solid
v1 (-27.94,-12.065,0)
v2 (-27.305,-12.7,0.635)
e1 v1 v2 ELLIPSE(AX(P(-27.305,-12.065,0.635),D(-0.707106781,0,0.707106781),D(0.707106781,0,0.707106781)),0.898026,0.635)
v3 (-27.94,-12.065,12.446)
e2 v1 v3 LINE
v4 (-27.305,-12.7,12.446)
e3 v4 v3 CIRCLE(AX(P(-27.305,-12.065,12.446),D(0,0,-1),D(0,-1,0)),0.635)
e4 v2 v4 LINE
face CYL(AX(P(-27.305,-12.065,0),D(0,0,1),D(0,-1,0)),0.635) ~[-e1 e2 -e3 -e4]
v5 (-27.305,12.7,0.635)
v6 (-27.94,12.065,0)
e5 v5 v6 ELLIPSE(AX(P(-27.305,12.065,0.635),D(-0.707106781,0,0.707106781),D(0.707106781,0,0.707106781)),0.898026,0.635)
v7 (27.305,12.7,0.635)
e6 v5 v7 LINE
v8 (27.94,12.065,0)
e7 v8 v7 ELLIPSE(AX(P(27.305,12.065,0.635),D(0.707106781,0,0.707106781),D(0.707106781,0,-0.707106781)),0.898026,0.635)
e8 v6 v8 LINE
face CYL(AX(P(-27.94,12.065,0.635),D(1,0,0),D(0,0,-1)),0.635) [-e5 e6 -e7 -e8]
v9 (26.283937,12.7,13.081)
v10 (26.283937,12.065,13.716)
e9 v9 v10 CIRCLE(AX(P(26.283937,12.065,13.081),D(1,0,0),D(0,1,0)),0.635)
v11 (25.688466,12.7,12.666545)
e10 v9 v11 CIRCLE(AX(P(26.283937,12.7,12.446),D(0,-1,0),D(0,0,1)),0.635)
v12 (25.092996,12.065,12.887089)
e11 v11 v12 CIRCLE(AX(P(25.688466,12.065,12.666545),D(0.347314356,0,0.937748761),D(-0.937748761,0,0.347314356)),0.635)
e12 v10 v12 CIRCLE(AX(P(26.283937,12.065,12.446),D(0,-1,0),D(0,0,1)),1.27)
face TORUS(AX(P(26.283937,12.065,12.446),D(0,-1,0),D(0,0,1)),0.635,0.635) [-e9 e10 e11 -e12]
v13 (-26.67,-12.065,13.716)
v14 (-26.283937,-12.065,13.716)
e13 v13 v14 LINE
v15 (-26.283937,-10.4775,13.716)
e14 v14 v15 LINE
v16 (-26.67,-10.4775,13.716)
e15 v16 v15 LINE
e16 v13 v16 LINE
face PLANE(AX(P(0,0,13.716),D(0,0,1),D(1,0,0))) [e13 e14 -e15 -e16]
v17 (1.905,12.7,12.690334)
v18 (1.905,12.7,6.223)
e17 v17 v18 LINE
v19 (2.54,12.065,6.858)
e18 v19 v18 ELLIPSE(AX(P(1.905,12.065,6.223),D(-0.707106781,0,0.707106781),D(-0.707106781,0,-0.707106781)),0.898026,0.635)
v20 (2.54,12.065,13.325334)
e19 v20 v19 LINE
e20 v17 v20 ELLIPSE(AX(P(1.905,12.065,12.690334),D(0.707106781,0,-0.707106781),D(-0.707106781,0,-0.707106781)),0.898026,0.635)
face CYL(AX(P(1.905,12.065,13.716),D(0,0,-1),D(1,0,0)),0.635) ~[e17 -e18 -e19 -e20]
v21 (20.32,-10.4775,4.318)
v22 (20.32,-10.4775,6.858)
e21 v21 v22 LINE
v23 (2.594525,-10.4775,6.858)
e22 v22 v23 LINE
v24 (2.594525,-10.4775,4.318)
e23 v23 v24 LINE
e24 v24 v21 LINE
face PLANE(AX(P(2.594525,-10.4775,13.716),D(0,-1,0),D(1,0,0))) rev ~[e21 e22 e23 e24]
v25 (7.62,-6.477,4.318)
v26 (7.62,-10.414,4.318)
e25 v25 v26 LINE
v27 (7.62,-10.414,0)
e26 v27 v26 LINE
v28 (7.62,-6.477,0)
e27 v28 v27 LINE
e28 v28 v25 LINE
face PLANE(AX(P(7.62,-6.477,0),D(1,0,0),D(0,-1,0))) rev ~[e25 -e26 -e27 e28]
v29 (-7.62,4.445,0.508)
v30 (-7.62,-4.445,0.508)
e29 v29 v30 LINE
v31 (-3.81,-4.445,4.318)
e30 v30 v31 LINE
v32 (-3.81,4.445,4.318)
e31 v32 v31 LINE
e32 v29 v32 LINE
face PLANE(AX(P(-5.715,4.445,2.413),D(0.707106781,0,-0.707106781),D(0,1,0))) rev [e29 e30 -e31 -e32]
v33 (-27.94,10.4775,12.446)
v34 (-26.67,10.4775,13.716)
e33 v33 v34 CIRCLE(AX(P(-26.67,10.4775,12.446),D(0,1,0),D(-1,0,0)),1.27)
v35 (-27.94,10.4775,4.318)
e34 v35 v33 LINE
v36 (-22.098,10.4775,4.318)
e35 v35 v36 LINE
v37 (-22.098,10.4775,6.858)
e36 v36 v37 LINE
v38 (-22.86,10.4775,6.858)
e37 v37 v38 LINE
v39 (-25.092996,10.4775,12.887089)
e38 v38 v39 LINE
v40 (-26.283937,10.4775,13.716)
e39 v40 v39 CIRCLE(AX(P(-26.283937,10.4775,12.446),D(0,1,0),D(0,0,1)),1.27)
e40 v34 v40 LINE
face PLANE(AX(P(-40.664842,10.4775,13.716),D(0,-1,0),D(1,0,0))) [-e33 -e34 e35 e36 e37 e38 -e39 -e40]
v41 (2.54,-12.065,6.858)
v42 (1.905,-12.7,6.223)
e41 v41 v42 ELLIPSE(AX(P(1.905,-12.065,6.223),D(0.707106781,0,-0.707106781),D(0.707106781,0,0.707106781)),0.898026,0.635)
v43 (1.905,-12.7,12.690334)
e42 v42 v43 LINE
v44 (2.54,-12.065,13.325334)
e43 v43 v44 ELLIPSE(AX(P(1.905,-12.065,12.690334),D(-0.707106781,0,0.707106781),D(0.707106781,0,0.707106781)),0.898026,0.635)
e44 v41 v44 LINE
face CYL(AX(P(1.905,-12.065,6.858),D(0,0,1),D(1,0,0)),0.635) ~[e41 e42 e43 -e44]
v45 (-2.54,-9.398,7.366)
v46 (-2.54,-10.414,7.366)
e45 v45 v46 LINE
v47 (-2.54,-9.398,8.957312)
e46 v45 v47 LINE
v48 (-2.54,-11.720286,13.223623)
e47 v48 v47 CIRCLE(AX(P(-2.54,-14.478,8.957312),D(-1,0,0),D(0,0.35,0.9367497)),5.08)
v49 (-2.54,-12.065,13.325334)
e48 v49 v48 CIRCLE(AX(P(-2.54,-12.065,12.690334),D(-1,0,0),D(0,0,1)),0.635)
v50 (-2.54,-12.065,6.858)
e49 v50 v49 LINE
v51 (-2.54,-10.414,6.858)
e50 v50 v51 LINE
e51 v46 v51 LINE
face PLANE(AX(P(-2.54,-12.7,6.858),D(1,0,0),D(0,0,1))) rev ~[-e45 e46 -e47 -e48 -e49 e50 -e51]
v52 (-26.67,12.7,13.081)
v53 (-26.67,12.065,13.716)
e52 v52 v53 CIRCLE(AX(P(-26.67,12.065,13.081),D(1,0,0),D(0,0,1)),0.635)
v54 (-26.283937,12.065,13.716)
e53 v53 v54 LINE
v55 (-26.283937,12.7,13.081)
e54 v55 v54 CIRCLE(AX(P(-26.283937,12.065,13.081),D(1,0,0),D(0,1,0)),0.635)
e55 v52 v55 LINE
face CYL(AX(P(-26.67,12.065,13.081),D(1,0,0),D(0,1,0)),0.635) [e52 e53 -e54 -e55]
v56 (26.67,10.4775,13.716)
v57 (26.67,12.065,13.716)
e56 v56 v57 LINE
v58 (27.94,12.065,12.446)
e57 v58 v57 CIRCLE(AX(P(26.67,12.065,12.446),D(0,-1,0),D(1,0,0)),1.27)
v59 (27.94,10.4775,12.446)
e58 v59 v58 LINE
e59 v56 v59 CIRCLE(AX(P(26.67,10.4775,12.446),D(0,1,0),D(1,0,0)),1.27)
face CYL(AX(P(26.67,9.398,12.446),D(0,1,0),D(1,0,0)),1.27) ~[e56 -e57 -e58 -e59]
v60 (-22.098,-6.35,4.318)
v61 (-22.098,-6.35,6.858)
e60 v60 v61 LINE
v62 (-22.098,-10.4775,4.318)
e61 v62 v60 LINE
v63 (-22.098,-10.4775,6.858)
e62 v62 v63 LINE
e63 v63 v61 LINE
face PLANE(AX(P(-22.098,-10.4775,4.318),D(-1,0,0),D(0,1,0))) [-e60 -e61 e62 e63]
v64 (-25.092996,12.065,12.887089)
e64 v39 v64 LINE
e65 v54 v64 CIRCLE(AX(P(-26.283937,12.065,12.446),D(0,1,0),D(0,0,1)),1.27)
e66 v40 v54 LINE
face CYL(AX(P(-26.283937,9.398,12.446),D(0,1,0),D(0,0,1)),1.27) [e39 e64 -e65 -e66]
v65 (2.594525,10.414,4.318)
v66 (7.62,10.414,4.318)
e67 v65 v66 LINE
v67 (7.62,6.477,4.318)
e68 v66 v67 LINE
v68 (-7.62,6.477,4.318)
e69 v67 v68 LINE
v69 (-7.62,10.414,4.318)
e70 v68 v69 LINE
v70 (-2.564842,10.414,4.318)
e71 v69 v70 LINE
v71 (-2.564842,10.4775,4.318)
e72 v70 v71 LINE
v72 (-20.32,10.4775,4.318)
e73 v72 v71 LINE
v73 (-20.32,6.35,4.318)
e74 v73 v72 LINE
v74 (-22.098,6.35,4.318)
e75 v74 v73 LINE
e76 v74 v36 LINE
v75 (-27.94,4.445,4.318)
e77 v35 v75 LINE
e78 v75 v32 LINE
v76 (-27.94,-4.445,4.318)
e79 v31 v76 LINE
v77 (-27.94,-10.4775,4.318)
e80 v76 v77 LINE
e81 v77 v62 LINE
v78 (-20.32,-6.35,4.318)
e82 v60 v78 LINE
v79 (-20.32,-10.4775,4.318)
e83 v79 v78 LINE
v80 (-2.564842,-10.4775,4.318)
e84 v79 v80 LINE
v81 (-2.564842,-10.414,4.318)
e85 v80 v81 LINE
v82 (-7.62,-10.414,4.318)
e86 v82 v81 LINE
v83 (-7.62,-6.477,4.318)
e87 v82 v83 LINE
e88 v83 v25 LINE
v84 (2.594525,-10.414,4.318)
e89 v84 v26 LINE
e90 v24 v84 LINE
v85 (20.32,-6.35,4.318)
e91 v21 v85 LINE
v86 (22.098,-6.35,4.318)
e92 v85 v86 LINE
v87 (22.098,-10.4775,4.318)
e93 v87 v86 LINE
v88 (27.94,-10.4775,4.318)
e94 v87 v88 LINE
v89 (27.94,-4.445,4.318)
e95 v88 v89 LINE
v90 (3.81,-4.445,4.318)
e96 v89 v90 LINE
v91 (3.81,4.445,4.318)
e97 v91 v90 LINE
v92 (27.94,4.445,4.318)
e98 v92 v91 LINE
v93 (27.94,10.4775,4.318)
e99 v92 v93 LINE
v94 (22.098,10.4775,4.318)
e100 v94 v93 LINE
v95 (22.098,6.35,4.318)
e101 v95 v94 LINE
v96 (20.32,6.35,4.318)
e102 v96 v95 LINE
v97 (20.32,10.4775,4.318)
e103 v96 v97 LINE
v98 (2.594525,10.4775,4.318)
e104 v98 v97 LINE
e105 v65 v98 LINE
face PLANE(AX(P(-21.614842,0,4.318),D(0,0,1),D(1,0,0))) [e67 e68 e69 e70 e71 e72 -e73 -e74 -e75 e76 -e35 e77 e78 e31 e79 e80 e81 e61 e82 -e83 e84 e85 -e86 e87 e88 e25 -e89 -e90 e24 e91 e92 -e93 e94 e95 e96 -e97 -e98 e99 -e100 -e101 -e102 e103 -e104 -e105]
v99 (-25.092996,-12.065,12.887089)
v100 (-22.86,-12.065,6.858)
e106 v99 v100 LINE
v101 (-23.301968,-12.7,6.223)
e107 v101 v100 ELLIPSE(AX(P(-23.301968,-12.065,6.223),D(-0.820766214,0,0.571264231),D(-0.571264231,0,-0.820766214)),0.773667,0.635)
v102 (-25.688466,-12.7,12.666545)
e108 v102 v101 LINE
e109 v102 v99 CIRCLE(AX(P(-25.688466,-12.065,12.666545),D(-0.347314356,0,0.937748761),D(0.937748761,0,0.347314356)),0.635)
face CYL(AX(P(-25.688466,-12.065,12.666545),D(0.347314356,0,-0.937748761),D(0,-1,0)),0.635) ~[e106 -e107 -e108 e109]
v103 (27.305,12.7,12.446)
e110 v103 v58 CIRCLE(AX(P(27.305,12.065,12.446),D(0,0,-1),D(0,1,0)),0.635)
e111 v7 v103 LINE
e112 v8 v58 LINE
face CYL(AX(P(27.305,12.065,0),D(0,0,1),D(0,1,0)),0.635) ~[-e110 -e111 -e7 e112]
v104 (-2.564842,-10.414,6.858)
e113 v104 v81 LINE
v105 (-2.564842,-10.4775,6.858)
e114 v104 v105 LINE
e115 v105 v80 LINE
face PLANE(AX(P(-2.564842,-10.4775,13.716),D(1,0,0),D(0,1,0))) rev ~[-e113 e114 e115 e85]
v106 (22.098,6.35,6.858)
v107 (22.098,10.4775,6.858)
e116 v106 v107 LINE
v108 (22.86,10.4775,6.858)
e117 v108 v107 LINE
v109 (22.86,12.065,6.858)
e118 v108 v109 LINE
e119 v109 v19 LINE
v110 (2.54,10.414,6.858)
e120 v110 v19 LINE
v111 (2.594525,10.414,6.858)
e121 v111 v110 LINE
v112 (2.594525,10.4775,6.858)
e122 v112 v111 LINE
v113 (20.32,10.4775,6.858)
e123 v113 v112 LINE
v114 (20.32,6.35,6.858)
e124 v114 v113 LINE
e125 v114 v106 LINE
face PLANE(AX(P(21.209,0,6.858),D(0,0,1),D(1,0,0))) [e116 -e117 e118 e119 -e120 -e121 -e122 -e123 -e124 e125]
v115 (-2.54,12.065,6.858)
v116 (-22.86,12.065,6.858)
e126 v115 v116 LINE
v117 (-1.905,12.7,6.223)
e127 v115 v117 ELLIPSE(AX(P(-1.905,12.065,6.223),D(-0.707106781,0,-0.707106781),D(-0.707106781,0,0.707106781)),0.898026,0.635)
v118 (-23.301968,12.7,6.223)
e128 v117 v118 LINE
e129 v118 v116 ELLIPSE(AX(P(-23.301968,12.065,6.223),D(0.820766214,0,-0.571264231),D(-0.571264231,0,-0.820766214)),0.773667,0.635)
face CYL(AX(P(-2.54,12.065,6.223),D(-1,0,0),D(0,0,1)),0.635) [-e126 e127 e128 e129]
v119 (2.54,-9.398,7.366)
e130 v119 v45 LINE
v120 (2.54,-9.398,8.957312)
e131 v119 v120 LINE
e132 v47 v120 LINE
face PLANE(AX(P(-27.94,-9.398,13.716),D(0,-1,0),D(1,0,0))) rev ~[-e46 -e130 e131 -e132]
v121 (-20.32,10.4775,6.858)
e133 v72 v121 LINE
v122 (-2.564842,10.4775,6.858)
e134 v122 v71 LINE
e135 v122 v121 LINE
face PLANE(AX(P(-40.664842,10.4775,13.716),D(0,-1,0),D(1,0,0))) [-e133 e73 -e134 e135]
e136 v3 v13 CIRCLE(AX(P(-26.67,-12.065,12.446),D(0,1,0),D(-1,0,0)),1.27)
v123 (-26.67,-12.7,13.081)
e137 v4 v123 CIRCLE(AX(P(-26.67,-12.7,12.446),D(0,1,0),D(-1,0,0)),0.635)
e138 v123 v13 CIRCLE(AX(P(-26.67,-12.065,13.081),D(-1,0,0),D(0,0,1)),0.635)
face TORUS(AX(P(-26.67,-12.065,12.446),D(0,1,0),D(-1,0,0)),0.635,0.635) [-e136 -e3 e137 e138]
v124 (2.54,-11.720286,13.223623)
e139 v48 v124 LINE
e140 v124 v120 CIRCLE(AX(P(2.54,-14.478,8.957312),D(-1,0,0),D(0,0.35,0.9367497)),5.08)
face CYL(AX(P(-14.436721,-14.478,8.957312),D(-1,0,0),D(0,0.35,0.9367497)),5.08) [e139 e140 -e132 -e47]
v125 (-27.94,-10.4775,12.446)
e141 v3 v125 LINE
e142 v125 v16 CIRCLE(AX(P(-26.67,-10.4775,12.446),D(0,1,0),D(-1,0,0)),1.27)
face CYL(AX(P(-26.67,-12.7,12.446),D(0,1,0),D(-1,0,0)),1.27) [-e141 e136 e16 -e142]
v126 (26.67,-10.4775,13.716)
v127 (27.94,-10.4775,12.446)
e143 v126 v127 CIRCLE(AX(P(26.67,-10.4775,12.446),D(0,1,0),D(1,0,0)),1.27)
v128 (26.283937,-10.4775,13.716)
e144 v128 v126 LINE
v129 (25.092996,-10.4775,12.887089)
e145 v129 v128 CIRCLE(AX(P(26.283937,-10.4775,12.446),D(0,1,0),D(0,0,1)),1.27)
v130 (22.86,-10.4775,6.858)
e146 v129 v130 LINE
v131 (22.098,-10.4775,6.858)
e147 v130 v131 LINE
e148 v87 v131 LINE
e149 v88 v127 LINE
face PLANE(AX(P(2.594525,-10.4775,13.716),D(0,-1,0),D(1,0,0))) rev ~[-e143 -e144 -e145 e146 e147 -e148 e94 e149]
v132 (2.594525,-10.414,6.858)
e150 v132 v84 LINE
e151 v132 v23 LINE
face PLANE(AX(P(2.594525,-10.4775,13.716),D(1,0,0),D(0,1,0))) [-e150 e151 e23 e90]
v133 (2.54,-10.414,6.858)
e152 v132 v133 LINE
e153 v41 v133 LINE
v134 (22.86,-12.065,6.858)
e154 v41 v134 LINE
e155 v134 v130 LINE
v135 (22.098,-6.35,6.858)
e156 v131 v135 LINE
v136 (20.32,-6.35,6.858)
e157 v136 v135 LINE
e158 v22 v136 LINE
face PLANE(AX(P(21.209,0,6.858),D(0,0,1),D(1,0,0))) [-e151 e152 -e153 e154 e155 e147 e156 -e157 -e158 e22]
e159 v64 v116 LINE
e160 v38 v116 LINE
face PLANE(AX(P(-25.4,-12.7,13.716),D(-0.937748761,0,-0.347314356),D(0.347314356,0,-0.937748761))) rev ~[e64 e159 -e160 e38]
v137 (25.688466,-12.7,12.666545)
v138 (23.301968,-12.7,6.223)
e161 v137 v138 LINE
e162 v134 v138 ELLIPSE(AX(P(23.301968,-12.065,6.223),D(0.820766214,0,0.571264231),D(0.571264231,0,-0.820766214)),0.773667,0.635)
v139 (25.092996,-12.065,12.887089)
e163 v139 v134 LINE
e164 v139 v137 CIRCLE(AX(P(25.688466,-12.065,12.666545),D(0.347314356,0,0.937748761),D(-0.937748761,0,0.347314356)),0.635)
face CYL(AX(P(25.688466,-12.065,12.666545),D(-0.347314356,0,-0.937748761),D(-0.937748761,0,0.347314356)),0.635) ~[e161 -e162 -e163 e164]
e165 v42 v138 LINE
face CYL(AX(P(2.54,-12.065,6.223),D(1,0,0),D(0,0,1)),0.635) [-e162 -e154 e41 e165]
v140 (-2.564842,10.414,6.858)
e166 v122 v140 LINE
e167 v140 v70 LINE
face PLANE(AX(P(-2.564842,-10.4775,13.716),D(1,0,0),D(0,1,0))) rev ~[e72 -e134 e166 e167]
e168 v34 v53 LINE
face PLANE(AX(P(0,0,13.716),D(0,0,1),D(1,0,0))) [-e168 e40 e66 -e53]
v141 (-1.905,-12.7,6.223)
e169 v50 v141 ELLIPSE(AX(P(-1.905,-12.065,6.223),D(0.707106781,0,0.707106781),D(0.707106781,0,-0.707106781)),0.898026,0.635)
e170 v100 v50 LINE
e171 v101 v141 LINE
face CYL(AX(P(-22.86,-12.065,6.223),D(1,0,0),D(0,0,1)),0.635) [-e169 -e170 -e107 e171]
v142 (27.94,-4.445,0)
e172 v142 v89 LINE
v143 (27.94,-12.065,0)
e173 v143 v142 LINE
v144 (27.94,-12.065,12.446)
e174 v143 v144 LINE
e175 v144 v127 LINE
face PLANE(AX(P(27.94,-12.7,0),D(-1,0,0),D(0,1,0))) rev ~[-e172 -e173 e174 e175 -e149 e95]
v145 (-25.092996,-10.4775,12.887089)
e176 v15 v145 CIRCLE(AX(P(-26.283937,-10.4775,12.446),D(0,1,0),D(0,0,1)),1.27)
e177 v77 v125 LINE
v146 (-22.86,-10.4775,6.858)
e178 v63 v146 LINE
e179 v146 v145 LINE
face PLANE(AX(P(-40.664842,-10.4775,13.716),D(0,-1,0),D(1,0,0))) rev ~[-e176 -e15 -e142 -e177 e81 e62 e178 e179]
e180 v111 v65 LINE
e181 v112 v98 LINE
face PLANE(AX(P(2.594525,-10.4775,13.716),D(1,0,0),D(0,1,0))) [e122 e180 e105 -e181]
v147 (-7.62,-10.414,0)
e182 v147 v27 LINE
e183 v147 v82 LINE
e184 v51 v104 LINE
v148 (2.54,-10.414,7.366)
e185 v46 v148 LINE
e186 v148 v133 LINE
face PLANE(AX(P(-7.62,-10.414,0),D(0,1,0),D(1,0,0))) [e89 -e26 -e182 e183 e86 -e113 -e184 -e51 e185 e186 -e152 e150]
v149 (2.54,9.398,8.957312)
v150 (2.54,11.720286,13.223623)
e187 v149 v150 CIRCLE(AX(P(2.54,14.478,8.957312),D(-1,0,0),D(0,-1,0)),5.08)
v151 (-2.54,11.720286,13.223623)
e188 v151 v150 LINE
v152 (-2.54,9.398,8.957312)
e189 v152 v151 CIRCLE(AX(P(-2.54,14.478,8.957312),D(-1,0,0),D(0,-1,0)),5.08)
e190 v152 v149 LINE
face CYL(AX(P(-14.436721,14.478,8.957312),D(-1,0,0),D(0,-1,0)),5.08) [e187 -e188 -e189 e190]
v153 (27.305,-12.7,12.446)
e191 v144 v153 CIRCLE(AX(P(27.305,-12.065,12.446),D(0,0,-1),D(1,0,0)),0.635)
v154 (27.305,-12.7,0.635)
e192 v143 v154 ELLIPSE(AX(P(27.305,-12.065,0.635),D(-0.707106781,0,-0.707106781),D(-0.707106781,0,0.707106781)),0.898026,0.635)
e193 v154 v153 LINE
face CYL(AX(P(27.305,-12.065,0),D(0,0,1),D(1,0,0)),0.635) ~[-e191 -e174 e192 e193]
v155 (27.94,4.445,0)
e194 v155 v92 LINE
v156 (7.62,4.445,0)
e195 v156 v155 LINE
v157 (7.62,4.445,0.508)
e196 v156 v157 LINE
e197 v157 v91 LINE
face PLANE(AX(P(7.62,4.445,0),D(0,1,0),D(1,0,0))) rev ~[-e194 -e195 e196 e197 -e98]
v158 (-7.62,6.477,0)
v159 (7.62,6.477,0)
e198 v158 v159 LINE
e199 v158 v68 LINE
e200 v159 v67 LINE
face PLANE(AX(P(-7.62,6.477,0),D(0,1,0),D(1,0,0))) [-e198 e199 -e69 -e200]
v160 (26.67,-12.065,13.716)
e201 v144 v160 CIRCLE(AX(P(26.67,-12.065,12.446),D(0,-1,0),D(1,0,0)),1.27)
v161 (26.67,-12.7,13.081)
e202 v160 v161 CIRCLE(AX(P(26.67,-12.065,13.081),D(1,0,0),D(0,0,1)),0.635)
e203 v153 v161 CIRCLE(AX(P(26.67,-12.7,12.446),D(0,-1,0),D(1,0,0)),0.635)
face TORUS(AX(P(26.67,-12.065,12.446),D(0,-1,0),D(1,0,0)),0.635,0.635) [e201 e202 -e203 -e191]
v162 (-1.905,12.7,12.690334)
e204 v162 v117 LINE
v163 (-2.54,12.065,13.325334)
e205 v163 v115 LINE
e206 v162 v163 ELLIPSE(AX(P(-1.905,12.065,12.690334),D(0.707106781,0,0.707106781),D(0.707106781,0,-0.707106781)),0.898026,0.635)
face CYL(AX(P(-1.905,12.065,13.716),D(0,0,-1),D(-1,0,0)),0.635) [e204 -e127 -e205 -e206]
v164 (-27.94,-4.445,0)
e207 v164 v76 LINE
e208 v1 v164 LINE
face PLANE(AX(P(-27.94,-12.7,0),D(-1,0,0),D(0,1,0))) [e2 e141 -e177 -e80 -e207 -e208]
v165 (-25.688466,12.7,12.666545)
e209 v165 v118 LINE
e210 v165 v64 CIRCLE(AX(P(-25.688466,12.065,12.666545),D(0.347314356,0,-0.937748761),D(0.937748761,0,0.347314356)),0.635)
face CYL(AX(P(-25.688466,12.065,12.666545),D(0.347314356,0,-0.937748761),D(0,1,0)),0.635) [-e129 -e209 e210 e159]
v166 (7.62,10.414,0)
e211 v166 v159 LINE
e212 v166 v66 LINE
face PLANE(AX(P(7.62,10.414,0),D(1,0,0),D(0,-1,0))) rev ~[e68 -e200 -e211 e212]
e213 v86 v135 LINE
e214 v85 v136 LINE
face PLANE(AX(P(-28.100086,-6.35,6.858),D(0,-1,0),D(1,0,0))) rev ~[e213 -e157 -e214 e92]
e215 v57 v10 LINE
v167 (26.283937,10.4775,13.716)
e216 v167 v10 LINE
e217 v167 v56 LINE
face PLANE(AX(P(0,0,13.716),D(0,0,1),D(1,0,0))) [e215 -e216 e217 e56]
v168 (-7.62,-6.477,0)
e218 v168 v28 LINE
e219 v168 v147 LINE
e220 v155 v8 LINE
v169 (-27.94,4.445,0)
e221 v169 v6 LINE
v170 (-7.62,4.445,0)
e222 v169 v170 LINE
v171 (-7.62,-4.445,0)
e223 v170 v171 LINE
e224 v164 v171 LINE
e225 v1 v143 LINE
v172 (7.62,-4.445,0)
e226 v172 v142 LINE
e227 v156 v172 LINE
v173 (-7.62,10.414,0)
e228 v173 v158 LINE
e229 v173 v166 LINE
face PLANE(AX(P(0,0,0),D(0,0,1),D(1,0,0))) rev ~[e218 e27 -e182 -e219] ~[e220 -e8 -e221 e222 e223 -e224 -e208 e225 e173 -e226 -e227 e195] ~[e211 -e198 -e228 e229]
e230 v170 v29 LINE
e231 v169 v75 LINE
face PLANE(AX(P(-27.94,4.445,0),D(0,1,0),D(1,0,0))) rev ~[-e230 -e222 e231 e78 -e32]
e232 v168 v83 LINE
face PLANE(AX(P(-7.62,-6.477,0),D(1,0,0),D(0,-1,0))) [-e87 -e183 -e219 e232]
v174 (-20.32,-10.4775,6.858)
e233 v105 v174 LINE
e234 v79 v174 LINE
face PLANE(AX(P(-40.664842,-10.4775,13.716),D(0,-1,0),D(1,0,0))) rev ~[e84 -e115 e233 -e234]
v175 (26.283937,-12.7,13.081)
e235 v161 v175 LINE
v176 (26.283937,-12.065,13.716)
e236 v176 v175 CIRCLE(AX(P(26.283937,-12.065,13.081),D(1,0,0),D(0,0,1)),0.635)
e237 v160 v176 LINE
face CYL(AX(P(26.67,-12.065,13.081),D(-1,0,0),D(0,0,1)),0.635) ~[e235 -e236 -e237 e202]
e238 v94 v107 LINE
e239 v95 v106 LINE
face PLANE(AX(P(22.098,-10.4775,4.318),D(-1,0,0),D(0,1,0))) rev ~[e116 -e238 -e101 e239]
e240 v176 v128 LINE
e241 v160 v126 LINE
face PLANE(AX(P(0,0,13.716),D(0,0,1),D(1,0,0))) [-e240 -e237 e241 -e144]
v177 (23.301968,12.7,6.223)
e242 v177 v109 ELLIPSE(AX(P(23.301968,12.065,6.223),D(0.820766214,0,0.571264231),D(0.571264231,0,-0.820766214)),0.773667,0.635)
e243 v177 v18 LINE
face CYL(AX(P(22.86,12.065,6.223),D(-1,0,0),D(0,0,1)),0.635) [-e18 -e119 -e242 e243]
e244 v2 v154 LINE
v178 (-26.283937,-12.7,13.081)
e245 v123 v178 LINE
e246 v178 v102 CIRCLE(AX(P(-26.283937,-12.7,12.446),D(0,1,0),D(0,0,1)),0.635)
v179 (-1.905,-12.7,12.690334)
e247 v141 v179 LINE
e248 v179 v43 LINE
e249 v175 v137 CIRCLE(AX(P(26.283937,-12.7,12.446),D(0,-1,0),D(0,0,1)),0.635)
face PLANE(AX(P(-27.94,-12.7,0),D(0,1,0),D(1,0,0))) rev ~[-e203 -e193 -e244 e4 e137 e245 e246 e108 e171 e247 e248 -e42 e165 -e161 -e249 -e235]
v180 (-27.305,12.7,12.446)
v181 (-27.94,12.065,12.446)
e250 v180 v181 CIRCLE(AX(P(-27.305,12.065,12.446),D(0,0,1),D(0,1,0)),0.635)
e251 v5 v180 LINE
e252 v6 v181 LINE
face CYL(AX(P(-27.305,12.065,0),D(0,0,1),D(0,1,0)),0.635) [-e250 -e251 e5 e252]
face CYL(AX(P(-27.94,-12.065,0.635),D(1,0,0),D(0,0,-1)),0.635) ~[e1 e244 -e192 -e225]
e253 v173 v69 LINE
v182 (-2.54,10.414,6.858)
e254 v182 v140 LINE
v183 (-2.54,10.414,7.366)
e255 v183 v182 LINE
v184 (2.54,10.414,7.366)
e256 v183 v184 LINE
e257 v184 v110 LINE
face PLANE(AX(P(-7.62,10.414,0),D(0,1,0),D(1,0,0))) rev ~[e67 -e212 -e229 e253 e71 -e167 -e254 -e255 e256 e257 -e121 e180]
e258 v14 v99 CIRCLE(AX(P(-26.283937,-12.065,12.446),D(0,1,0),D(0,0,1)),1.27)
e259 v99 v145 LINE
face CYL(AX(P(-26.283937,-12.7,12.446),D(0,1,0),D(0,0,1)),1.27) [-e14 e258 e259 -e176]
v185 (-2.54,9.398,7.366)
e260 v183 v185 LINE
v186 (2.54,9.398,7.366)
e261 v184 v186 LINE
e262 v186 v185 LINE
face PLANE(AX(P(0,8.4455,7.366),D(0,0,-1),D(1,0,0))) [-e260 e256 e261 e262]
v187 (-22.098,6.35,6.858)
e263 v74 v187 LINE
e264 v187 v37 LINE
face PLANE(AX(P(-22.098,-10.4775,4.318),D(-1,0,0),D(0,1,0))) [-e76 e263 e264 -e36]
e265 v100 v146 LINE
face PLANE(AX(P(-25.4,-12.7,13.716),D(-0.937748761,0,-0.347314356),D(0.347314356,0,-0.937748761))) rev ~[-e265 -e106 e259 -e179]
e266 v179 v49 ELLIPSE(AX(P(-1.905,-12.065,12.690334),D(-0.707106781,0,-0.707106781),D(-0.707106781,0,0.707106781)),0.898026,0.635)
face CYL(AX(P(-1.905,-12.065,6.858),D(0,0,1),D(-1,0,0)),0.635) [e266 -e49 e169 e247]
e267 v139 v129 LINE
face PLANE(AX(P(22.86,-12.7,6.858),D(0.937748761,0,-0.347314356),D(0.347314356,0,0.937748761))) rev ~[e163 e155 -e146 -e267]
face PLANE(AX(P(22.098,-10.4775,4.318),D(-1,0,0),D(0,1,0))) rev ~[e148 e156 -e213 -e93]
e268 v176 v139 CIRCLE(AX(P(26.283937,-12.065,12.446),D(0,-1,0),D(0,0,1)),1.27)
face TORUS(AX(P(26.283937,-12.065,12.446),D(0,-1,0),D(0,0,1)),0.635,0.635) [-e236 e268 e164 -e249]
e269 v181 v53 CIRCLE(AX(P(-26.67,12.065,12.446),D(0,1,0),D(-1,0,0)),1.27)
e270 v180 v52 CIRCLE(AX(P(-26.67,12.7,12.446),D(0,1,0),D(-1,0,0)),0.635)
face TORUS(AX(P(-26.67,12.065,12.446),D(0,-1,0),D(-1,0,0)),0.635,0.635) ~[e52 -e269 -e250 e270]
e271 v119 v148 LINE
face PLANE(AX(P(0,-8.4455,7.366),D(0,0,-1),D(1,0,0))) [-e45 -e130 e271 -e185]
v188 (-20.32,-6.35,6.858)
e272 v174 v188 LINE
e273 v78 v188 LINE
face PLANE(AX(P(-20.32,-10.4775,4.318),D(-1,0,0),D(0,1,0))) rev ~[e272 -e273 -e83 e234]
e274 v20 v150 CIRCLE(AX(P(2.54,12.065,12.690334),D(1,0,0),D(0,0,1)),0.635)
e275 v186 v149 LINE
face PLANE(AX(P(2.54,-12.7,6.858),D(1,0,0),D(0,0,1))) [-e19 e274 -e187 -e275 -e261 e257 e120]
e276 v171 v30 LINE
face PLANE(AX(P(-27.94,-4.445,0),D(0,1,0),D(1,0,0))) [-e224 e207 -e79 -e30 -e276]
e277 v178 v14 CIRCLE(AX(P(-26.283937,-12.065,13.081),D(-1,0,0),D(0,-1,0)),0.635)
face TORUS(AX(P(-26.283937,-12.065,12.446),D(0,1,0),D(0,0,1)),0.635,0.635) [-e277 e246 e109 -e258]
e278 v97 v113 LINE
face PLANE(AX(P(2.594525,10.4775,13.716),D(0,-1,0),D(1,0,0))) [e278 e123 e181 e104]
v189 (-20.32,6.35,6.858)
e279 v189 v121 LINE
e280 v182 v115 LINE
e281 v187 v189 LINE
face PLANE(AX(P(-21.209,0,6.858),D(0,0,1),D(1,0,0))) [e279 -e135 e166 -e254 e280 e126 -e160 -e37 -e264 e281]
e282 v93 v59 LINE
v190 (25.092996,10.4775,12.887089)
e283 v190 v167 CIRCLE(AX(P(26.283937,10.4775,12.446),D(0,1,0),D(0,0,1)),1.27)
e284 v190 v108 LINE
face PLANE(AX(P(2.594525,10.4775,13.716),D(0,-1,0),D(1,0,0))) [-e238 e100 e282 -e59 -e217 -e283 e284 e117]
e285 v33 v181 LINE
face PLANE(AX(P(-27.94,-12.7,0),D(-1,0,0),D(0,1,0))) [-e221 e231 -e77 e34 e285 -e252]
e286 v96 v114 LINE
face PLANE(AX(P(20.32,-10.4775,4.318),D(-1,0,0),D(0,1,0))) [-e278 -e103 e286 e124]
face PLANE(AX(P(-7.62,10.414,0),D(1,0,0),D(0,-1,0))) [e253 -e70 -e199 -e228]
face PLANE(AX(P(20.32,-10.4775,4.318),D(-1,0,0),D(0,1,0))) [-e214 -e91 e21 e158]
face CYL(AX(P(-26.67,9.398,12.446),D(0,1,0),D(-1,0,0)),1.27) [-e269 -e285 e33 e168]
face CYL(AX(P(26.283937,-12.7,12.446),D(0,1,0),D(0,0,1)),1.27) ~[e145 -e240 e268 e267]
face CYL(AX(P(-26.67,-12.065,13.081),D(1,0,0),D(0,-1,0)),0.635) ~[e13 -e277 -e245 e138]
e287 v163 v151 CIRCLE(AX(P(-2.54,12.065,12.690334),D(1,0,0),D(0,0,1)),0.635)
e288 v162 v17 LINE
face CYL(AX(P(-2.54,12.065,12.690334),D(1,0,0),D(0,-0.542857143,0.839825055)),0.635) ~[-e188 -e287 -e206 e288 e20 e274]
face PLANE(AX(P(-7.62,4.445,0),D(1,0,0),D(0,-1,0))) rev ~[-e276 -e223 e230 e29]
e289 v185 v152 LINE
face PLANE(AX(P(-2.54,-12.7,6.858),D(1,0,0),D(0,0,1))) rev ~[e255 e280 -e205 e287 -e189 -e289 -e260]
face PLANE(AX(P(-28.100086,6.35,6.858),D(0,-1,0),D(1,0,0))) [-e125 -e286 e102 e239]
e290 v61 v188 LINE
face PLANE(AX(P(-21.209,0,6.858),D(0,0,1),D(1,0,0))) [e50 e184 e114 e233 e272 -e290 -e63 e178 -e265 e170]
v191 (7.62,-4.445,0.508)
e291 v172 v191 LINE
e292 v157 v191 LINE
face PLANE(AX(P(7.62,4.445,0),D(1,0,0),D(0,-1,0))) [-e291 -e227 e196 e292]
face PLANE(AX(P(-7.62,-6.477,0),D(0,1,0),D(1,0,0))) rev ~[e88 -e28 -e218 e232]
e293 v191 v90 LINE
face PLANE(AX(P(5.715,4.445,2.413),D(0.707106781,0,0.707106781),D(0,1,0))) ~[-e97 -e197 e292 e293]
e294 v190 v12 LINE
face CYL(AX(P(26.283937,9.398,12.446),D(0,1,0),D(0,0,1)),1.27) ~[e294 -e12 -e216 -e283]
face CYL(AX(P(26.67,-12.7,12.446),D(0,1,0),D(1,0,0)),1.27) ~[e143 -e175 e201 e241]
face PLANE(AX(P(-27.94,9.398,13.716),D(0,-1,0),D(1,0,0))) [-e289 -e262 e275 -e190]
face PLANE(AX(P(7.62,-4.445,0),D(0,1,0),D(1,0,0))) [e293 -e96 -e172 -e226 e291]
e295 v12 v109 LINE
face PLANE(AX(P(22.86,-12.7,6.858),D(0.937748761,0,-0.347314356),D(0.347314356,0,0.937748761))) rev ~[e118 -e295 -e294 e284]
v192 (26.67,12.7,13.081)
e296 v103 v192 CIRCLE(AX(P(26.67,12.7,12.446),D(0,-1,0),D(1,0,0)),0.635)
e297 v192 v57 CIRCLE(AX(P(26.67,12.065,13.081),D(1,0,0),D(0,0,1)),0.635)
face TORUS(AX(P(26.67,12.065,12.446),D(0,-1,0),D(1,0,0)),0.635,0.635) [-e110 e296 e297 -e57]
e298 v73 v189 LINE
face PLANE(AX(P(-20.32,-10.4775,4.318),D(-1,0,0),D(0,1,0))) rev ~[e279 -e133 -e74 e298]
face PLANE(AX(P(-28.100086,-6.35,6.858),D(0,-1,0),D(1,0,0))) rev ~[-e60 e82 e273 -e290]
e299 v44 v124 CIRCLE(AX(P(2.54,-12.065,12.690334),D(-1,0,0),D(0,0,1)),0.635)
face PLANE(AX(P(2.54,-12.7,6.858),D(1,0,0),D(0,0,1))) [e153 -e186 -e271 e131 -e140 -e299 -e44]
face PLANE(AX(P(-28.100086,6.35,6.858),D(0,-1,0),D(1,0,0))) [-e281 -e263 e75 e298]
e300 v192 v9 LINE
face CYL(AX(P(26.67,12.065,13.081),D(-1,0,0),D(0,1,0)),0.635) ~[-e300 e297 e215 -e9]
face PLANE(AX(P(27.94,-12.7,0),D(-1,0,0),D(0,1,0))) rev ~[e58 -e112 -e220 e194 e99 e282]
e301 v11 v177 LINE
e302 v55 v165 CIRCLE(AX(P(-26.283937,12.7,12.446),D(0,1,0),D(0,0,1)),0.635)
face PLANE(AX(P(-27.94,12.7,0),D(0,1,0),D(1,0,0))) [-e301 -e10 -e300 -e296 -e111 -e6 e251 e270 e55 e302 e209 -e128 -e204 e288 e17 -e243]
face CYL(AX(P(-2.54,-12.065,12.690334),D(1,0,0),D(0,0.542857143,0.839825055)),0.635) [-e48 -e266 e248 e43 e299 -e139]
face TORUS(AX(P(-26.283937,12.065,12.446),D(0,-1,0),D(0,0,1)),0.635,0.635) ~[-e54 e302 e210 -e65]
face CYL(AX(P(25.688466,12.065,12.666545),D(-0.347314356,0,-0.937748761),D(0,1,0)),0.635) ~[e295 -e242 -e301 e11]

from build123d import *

# Parameters (mm, degrees)
F0_W         = 55.88
F0_H         = 25.4
F1_DEPTH     = 13.716
F2_W         = 20.32
F2_H         = 8.89
F3_DEPTH     = 13.717
F4_W         = 20.32
F4_H         = 8.89
F5_DEPTH     = 13.717
F6_W         = 15.24
F6_H         = 3.937
F7_DEPTH     = 7.366
F8_W         = 15.24
F8_H         = 3.937
F9_DEPTH     = 7.366
F10_W        = 55.88
F10_H        = 18.796
F11_DEPTH    = 9.398
F12_W        = 20.32
F12_H        = 6.858
F13_DEPTH    = 25.401
F14_W        = 20.32
F14_H        = 6.858
F15_DEPTH    = 25.401
F17_DEPTH    = 25.401
F19_DEPTH    = 25.401
F20_R        = 1.27
F21_W        = 38.1
F21_H        = 20.955
F22_DEPTH    = 9.398
F23_W        = 38.1
F23_H        = 20.955
F24_DEPTH    = 9.398
F25_T1_DEPTH = 28.8734423739
F26_W        = 1.778
F26_H        = 20.955
F27_DEPTH    = 2.54
F28_W        = 1.778
F28_H        = 20.955
F29_DEPTH    = 2.54
F30_W        = 55.88
F30_H        = 12.7
F31_DEPTH    = 2.54
F32_SIZE     = 3.81
F33_R        = 0.635


# Not quite as in the source:
# - a fillet or chamfer that OpenCascade refuses, or shapes differently, is made with other operations: its cross-section is extruded or revolved along the edge and cut away or added


with BuildPart() as f1:
    # F0 (on Top) → F1 (new body)
    with BuildSketch(Plane.XY):
        Rectangle(F0_W, F0_H)
    extrude(amount=F1_DEPTH)

    # F2 (on face) → F3 (cut, through all)
    with BuildSketch(Plane(origin=(0, 0, 0), x_dir=(1, 0, 0), z_dir=(0, 0, -1))):
        with Locations((17.78, 0)):
            Rectangle(F2_W, F2_H)
    extrude(amount=-F3_DEPTH, mode=Mode.SUBTRACT)

    # F4 (on face) → F5 (cut, through all)
    with BuildSketch(Plane(origin=(0, 0, 0), x_dir=(1, 0, 0), z_dir=(0, 0, -1))):
        with Locations((-17.78, 0)):
            Rectangle(F4_W, F4_H)
    extrude(amount=-F5_DEPTH, mode=Mode.SUBTRACT)

    # F6 (on face) → F7 (cut)
    with BuildSketch(Plane(origin=(0, 0, 0), x_dir=(1, 0, 0), z_dir=(0, 0, -1))):
        with Locations((0, 8.4455)):
            Rectangle(F6_W, F6_H)
    extrude(amount=-F7_DEPTH, mode=Mode.SUBTRACT)

    # F8 (on face) → F9 (cut)
    with BuildSketch(Plane(origin=(0, 0, 0), x_dir=(1, 0, 0), z_dir=(0, 0, -1))):
        with Locations((0, -8.4455)):
            Rectangle(F8_W, F8_H)
    extrude(amount=-F9_DEPTH, mode=Mode.SUBTRACT)

    # F10 (on face) → F11 (cut)
    with BuildSketch(Plane.XY.offset(13.716)):
        Rectangle(F10_W, F10_H)
    extrude(amount=-F11_DEPTH, mode=Mode.SUBTRACT)

    # F12 (on face) → F13 (cut, through all)
    with BuildSketch(Plane.XZ.offset(12.7)):
        with Locations((-12.7, 10.287)):
            Rectangle(F12_W, F12_H)
    extrude(amount=-F13_DEPTH, mode=Mode.SUBTRACT)

    # F14 (on face) → F15 (cut, through all)
    with BuildSketch(Plane.XZ.offset(12.7)):
        with Locations((12.7, 10.287)):
            Rectangle(F14_W, F14_H)
    extrude(amount=-F15_DEPTH, mode=Mode.SUBTRACT)

    # F16 (on face) → F17 (cut, through all)
    with BuildSketch(Plane.XZ.offset(12.7)):
        Polygon((-25.4, 13.716), (-22.86, 6.858), (-22.86, 13.716), align=None)
    extrude(amount=-F17_DEPTH, mode=Mode.SUBTRACT)

    # F18 (on face) → F19 (cut, through all)
    with BuildSketch(Plane.XZ.offset(12.7)):
        Polygon((22.86, 13.716), (22.86, 6.858), (25.4, 13.716), align=None)
    extrude(amount=-F19_DEPTH, mode=Mode.SUBTRACT)

    # F20
    f20_edges = [f1.edges().sort_by_distance(p)[0] for p in [
        (-25.4, 11.049, 13.716),
        (-25.4, -11.049, 13.716),
        (25.4, 11.049, 13.716),
        (25.4, -11.049, 13.716),
        (-27.94, 11.049, 13.716),
        (-27.94, -11.049, 13.716),
        (27.94, -11.049, 13.716),
        (27.94, 11.049, 13.716),
    ]]
    fillet(f20_edges, radius=F20_R)

    # F21 (on face) → F22 (cut)
    with BuildSketch(Plane.XY.offset(13.716)):
        with Locations((-21.6148423028, 0)):
            Rectangle(F21_W, F21_H)
    extrude(amount=-F22_DEPTH, mode=Mode.SUBTRACT)

    # F23 (on face) → F24 (cut)
    with BuildSketch(Plane.XY.offset(13.716)):
        with Locations((21.6445253996, 0)):
            Rectangle(F23_W, F23_H)
    extrude(amount=-F24_DEPTH, mode=Mode.SUBTRACT)

    # F25: fillet of radius 5.08 on 2 edges, made by hand

    # F25_s2 → F25_t1 (cut)
    with BuildSketch(Plane.YZ.offset(-14.4367211869)):
        with BuildLine():
            ThreePointArc((9.398, 8.9573115252), (10.3043541118, 11.853357105), (12.7, 13.716))
            Line((12.7, 13.716), (9.398, 13.716))
            Line((9.398, 13.716), (9.398, 8.9573115252))
        make_face()
        with BuildLine():
            ThreePointArc((-12.7, 13.716), (-10.3043541118, 11.853357105), (-9.398, 8.9573115252))
            Line((-9.398, 8.9573115252), (-9.398, 13.716))
            Line((-9.398, 13.716), (-12.7, 13.716))
        make_face()
    extrude(amount=F25_T1_DEPTH, mode=Mode.SUBTRACT)

    # F26 (on face) → F27 (join)
    with BuildSketch(Plane.XY.offset(4.318)):
        with Locations((21.209, 0)):
            Rectangle(F26_W, F26_H)
    extrude(amount=F27_DEPTH)

    # F28 (on face) → F29 (join)
    with BuildSketch(Plane.XY.offset(4.318)):
        with Locations((-21.209, 0)):
            Rectangle(F28_W, F28_H)
    extrude(amount=F29_DEPTH)

    # F30 (on face) → F31 (cut)
    with BuildSketch(Plane.XY.offset(6.858)):
        with Locations((-0.1600864343, 0)):
            Rectangle(F30_W, F30_H)
    extrude(amount=-F31_DEPTH, mode=Mode.SUBTRACT)

    # F32
    f32_edges = [f1.edges().sort_by_distance(p)[0] for p in [
        (7.62, 0, 4.318),
        (-7.62, 0, 4.318),
    ]]
    chamfer(f32_edges, length=F32_SIZE)

    # F33
    f33_edges = [f1.edges().sort_by_distance(p)[0] for p in [
        (27.94, -12.7, 6.223),
        (27.568026, -12.7, 13.344026),
        (0, -12.7, 0),
        (26.476968, -12.7, 13.716),
        (-27.94, -12.7, 6.223),
        (25.558431, -12.7, 13.488373),
        (-27.568026, -12.7, 13.344026),
        (23.976498, -12.7, 9.872545),
        (-26.476968, -12.7, 13.716),
        (12.7, -12.7, 6.858),
        (-25.558431, -12.7, 13.488373),
        (2.54, -12.7, 10.287),
        (-23.976498, -12.7, 9.872545),
        (0, -12.7, 13.716),
        (-12.7, -12.7, 6.858),
        (-2.54, -12.7, 10.287),
        (-27.94, 12.7, 6.223),
        (-27.568026, 12.7, 13.344026),
        (0, 12.7, 0),
        (-26.476968, 12.7, 13.716),
        (27.94, 12.7, 6.223),
        (-25.558431, 12.7, 13.488373),
        (27.568026, 12.7, 13.344026),
        (-23.976498, 12.7, 9.872545),
        (26.476968, 12.7, 13.716),
        (-12.7, 12.7, 6.858),
        (25.558431, 12.7, 13.488373),
        (-2.54, 12.7, 10.287),
        (23.976498, 12.7, 9.872545),
        (0, 12.7, 13.716),
        (12.7, 12.7, 6.858),
        (2.54, 12.7, 10.287),
    ]]
    fillet(f33_edges, radius=F33_R)


solid = f1.part
